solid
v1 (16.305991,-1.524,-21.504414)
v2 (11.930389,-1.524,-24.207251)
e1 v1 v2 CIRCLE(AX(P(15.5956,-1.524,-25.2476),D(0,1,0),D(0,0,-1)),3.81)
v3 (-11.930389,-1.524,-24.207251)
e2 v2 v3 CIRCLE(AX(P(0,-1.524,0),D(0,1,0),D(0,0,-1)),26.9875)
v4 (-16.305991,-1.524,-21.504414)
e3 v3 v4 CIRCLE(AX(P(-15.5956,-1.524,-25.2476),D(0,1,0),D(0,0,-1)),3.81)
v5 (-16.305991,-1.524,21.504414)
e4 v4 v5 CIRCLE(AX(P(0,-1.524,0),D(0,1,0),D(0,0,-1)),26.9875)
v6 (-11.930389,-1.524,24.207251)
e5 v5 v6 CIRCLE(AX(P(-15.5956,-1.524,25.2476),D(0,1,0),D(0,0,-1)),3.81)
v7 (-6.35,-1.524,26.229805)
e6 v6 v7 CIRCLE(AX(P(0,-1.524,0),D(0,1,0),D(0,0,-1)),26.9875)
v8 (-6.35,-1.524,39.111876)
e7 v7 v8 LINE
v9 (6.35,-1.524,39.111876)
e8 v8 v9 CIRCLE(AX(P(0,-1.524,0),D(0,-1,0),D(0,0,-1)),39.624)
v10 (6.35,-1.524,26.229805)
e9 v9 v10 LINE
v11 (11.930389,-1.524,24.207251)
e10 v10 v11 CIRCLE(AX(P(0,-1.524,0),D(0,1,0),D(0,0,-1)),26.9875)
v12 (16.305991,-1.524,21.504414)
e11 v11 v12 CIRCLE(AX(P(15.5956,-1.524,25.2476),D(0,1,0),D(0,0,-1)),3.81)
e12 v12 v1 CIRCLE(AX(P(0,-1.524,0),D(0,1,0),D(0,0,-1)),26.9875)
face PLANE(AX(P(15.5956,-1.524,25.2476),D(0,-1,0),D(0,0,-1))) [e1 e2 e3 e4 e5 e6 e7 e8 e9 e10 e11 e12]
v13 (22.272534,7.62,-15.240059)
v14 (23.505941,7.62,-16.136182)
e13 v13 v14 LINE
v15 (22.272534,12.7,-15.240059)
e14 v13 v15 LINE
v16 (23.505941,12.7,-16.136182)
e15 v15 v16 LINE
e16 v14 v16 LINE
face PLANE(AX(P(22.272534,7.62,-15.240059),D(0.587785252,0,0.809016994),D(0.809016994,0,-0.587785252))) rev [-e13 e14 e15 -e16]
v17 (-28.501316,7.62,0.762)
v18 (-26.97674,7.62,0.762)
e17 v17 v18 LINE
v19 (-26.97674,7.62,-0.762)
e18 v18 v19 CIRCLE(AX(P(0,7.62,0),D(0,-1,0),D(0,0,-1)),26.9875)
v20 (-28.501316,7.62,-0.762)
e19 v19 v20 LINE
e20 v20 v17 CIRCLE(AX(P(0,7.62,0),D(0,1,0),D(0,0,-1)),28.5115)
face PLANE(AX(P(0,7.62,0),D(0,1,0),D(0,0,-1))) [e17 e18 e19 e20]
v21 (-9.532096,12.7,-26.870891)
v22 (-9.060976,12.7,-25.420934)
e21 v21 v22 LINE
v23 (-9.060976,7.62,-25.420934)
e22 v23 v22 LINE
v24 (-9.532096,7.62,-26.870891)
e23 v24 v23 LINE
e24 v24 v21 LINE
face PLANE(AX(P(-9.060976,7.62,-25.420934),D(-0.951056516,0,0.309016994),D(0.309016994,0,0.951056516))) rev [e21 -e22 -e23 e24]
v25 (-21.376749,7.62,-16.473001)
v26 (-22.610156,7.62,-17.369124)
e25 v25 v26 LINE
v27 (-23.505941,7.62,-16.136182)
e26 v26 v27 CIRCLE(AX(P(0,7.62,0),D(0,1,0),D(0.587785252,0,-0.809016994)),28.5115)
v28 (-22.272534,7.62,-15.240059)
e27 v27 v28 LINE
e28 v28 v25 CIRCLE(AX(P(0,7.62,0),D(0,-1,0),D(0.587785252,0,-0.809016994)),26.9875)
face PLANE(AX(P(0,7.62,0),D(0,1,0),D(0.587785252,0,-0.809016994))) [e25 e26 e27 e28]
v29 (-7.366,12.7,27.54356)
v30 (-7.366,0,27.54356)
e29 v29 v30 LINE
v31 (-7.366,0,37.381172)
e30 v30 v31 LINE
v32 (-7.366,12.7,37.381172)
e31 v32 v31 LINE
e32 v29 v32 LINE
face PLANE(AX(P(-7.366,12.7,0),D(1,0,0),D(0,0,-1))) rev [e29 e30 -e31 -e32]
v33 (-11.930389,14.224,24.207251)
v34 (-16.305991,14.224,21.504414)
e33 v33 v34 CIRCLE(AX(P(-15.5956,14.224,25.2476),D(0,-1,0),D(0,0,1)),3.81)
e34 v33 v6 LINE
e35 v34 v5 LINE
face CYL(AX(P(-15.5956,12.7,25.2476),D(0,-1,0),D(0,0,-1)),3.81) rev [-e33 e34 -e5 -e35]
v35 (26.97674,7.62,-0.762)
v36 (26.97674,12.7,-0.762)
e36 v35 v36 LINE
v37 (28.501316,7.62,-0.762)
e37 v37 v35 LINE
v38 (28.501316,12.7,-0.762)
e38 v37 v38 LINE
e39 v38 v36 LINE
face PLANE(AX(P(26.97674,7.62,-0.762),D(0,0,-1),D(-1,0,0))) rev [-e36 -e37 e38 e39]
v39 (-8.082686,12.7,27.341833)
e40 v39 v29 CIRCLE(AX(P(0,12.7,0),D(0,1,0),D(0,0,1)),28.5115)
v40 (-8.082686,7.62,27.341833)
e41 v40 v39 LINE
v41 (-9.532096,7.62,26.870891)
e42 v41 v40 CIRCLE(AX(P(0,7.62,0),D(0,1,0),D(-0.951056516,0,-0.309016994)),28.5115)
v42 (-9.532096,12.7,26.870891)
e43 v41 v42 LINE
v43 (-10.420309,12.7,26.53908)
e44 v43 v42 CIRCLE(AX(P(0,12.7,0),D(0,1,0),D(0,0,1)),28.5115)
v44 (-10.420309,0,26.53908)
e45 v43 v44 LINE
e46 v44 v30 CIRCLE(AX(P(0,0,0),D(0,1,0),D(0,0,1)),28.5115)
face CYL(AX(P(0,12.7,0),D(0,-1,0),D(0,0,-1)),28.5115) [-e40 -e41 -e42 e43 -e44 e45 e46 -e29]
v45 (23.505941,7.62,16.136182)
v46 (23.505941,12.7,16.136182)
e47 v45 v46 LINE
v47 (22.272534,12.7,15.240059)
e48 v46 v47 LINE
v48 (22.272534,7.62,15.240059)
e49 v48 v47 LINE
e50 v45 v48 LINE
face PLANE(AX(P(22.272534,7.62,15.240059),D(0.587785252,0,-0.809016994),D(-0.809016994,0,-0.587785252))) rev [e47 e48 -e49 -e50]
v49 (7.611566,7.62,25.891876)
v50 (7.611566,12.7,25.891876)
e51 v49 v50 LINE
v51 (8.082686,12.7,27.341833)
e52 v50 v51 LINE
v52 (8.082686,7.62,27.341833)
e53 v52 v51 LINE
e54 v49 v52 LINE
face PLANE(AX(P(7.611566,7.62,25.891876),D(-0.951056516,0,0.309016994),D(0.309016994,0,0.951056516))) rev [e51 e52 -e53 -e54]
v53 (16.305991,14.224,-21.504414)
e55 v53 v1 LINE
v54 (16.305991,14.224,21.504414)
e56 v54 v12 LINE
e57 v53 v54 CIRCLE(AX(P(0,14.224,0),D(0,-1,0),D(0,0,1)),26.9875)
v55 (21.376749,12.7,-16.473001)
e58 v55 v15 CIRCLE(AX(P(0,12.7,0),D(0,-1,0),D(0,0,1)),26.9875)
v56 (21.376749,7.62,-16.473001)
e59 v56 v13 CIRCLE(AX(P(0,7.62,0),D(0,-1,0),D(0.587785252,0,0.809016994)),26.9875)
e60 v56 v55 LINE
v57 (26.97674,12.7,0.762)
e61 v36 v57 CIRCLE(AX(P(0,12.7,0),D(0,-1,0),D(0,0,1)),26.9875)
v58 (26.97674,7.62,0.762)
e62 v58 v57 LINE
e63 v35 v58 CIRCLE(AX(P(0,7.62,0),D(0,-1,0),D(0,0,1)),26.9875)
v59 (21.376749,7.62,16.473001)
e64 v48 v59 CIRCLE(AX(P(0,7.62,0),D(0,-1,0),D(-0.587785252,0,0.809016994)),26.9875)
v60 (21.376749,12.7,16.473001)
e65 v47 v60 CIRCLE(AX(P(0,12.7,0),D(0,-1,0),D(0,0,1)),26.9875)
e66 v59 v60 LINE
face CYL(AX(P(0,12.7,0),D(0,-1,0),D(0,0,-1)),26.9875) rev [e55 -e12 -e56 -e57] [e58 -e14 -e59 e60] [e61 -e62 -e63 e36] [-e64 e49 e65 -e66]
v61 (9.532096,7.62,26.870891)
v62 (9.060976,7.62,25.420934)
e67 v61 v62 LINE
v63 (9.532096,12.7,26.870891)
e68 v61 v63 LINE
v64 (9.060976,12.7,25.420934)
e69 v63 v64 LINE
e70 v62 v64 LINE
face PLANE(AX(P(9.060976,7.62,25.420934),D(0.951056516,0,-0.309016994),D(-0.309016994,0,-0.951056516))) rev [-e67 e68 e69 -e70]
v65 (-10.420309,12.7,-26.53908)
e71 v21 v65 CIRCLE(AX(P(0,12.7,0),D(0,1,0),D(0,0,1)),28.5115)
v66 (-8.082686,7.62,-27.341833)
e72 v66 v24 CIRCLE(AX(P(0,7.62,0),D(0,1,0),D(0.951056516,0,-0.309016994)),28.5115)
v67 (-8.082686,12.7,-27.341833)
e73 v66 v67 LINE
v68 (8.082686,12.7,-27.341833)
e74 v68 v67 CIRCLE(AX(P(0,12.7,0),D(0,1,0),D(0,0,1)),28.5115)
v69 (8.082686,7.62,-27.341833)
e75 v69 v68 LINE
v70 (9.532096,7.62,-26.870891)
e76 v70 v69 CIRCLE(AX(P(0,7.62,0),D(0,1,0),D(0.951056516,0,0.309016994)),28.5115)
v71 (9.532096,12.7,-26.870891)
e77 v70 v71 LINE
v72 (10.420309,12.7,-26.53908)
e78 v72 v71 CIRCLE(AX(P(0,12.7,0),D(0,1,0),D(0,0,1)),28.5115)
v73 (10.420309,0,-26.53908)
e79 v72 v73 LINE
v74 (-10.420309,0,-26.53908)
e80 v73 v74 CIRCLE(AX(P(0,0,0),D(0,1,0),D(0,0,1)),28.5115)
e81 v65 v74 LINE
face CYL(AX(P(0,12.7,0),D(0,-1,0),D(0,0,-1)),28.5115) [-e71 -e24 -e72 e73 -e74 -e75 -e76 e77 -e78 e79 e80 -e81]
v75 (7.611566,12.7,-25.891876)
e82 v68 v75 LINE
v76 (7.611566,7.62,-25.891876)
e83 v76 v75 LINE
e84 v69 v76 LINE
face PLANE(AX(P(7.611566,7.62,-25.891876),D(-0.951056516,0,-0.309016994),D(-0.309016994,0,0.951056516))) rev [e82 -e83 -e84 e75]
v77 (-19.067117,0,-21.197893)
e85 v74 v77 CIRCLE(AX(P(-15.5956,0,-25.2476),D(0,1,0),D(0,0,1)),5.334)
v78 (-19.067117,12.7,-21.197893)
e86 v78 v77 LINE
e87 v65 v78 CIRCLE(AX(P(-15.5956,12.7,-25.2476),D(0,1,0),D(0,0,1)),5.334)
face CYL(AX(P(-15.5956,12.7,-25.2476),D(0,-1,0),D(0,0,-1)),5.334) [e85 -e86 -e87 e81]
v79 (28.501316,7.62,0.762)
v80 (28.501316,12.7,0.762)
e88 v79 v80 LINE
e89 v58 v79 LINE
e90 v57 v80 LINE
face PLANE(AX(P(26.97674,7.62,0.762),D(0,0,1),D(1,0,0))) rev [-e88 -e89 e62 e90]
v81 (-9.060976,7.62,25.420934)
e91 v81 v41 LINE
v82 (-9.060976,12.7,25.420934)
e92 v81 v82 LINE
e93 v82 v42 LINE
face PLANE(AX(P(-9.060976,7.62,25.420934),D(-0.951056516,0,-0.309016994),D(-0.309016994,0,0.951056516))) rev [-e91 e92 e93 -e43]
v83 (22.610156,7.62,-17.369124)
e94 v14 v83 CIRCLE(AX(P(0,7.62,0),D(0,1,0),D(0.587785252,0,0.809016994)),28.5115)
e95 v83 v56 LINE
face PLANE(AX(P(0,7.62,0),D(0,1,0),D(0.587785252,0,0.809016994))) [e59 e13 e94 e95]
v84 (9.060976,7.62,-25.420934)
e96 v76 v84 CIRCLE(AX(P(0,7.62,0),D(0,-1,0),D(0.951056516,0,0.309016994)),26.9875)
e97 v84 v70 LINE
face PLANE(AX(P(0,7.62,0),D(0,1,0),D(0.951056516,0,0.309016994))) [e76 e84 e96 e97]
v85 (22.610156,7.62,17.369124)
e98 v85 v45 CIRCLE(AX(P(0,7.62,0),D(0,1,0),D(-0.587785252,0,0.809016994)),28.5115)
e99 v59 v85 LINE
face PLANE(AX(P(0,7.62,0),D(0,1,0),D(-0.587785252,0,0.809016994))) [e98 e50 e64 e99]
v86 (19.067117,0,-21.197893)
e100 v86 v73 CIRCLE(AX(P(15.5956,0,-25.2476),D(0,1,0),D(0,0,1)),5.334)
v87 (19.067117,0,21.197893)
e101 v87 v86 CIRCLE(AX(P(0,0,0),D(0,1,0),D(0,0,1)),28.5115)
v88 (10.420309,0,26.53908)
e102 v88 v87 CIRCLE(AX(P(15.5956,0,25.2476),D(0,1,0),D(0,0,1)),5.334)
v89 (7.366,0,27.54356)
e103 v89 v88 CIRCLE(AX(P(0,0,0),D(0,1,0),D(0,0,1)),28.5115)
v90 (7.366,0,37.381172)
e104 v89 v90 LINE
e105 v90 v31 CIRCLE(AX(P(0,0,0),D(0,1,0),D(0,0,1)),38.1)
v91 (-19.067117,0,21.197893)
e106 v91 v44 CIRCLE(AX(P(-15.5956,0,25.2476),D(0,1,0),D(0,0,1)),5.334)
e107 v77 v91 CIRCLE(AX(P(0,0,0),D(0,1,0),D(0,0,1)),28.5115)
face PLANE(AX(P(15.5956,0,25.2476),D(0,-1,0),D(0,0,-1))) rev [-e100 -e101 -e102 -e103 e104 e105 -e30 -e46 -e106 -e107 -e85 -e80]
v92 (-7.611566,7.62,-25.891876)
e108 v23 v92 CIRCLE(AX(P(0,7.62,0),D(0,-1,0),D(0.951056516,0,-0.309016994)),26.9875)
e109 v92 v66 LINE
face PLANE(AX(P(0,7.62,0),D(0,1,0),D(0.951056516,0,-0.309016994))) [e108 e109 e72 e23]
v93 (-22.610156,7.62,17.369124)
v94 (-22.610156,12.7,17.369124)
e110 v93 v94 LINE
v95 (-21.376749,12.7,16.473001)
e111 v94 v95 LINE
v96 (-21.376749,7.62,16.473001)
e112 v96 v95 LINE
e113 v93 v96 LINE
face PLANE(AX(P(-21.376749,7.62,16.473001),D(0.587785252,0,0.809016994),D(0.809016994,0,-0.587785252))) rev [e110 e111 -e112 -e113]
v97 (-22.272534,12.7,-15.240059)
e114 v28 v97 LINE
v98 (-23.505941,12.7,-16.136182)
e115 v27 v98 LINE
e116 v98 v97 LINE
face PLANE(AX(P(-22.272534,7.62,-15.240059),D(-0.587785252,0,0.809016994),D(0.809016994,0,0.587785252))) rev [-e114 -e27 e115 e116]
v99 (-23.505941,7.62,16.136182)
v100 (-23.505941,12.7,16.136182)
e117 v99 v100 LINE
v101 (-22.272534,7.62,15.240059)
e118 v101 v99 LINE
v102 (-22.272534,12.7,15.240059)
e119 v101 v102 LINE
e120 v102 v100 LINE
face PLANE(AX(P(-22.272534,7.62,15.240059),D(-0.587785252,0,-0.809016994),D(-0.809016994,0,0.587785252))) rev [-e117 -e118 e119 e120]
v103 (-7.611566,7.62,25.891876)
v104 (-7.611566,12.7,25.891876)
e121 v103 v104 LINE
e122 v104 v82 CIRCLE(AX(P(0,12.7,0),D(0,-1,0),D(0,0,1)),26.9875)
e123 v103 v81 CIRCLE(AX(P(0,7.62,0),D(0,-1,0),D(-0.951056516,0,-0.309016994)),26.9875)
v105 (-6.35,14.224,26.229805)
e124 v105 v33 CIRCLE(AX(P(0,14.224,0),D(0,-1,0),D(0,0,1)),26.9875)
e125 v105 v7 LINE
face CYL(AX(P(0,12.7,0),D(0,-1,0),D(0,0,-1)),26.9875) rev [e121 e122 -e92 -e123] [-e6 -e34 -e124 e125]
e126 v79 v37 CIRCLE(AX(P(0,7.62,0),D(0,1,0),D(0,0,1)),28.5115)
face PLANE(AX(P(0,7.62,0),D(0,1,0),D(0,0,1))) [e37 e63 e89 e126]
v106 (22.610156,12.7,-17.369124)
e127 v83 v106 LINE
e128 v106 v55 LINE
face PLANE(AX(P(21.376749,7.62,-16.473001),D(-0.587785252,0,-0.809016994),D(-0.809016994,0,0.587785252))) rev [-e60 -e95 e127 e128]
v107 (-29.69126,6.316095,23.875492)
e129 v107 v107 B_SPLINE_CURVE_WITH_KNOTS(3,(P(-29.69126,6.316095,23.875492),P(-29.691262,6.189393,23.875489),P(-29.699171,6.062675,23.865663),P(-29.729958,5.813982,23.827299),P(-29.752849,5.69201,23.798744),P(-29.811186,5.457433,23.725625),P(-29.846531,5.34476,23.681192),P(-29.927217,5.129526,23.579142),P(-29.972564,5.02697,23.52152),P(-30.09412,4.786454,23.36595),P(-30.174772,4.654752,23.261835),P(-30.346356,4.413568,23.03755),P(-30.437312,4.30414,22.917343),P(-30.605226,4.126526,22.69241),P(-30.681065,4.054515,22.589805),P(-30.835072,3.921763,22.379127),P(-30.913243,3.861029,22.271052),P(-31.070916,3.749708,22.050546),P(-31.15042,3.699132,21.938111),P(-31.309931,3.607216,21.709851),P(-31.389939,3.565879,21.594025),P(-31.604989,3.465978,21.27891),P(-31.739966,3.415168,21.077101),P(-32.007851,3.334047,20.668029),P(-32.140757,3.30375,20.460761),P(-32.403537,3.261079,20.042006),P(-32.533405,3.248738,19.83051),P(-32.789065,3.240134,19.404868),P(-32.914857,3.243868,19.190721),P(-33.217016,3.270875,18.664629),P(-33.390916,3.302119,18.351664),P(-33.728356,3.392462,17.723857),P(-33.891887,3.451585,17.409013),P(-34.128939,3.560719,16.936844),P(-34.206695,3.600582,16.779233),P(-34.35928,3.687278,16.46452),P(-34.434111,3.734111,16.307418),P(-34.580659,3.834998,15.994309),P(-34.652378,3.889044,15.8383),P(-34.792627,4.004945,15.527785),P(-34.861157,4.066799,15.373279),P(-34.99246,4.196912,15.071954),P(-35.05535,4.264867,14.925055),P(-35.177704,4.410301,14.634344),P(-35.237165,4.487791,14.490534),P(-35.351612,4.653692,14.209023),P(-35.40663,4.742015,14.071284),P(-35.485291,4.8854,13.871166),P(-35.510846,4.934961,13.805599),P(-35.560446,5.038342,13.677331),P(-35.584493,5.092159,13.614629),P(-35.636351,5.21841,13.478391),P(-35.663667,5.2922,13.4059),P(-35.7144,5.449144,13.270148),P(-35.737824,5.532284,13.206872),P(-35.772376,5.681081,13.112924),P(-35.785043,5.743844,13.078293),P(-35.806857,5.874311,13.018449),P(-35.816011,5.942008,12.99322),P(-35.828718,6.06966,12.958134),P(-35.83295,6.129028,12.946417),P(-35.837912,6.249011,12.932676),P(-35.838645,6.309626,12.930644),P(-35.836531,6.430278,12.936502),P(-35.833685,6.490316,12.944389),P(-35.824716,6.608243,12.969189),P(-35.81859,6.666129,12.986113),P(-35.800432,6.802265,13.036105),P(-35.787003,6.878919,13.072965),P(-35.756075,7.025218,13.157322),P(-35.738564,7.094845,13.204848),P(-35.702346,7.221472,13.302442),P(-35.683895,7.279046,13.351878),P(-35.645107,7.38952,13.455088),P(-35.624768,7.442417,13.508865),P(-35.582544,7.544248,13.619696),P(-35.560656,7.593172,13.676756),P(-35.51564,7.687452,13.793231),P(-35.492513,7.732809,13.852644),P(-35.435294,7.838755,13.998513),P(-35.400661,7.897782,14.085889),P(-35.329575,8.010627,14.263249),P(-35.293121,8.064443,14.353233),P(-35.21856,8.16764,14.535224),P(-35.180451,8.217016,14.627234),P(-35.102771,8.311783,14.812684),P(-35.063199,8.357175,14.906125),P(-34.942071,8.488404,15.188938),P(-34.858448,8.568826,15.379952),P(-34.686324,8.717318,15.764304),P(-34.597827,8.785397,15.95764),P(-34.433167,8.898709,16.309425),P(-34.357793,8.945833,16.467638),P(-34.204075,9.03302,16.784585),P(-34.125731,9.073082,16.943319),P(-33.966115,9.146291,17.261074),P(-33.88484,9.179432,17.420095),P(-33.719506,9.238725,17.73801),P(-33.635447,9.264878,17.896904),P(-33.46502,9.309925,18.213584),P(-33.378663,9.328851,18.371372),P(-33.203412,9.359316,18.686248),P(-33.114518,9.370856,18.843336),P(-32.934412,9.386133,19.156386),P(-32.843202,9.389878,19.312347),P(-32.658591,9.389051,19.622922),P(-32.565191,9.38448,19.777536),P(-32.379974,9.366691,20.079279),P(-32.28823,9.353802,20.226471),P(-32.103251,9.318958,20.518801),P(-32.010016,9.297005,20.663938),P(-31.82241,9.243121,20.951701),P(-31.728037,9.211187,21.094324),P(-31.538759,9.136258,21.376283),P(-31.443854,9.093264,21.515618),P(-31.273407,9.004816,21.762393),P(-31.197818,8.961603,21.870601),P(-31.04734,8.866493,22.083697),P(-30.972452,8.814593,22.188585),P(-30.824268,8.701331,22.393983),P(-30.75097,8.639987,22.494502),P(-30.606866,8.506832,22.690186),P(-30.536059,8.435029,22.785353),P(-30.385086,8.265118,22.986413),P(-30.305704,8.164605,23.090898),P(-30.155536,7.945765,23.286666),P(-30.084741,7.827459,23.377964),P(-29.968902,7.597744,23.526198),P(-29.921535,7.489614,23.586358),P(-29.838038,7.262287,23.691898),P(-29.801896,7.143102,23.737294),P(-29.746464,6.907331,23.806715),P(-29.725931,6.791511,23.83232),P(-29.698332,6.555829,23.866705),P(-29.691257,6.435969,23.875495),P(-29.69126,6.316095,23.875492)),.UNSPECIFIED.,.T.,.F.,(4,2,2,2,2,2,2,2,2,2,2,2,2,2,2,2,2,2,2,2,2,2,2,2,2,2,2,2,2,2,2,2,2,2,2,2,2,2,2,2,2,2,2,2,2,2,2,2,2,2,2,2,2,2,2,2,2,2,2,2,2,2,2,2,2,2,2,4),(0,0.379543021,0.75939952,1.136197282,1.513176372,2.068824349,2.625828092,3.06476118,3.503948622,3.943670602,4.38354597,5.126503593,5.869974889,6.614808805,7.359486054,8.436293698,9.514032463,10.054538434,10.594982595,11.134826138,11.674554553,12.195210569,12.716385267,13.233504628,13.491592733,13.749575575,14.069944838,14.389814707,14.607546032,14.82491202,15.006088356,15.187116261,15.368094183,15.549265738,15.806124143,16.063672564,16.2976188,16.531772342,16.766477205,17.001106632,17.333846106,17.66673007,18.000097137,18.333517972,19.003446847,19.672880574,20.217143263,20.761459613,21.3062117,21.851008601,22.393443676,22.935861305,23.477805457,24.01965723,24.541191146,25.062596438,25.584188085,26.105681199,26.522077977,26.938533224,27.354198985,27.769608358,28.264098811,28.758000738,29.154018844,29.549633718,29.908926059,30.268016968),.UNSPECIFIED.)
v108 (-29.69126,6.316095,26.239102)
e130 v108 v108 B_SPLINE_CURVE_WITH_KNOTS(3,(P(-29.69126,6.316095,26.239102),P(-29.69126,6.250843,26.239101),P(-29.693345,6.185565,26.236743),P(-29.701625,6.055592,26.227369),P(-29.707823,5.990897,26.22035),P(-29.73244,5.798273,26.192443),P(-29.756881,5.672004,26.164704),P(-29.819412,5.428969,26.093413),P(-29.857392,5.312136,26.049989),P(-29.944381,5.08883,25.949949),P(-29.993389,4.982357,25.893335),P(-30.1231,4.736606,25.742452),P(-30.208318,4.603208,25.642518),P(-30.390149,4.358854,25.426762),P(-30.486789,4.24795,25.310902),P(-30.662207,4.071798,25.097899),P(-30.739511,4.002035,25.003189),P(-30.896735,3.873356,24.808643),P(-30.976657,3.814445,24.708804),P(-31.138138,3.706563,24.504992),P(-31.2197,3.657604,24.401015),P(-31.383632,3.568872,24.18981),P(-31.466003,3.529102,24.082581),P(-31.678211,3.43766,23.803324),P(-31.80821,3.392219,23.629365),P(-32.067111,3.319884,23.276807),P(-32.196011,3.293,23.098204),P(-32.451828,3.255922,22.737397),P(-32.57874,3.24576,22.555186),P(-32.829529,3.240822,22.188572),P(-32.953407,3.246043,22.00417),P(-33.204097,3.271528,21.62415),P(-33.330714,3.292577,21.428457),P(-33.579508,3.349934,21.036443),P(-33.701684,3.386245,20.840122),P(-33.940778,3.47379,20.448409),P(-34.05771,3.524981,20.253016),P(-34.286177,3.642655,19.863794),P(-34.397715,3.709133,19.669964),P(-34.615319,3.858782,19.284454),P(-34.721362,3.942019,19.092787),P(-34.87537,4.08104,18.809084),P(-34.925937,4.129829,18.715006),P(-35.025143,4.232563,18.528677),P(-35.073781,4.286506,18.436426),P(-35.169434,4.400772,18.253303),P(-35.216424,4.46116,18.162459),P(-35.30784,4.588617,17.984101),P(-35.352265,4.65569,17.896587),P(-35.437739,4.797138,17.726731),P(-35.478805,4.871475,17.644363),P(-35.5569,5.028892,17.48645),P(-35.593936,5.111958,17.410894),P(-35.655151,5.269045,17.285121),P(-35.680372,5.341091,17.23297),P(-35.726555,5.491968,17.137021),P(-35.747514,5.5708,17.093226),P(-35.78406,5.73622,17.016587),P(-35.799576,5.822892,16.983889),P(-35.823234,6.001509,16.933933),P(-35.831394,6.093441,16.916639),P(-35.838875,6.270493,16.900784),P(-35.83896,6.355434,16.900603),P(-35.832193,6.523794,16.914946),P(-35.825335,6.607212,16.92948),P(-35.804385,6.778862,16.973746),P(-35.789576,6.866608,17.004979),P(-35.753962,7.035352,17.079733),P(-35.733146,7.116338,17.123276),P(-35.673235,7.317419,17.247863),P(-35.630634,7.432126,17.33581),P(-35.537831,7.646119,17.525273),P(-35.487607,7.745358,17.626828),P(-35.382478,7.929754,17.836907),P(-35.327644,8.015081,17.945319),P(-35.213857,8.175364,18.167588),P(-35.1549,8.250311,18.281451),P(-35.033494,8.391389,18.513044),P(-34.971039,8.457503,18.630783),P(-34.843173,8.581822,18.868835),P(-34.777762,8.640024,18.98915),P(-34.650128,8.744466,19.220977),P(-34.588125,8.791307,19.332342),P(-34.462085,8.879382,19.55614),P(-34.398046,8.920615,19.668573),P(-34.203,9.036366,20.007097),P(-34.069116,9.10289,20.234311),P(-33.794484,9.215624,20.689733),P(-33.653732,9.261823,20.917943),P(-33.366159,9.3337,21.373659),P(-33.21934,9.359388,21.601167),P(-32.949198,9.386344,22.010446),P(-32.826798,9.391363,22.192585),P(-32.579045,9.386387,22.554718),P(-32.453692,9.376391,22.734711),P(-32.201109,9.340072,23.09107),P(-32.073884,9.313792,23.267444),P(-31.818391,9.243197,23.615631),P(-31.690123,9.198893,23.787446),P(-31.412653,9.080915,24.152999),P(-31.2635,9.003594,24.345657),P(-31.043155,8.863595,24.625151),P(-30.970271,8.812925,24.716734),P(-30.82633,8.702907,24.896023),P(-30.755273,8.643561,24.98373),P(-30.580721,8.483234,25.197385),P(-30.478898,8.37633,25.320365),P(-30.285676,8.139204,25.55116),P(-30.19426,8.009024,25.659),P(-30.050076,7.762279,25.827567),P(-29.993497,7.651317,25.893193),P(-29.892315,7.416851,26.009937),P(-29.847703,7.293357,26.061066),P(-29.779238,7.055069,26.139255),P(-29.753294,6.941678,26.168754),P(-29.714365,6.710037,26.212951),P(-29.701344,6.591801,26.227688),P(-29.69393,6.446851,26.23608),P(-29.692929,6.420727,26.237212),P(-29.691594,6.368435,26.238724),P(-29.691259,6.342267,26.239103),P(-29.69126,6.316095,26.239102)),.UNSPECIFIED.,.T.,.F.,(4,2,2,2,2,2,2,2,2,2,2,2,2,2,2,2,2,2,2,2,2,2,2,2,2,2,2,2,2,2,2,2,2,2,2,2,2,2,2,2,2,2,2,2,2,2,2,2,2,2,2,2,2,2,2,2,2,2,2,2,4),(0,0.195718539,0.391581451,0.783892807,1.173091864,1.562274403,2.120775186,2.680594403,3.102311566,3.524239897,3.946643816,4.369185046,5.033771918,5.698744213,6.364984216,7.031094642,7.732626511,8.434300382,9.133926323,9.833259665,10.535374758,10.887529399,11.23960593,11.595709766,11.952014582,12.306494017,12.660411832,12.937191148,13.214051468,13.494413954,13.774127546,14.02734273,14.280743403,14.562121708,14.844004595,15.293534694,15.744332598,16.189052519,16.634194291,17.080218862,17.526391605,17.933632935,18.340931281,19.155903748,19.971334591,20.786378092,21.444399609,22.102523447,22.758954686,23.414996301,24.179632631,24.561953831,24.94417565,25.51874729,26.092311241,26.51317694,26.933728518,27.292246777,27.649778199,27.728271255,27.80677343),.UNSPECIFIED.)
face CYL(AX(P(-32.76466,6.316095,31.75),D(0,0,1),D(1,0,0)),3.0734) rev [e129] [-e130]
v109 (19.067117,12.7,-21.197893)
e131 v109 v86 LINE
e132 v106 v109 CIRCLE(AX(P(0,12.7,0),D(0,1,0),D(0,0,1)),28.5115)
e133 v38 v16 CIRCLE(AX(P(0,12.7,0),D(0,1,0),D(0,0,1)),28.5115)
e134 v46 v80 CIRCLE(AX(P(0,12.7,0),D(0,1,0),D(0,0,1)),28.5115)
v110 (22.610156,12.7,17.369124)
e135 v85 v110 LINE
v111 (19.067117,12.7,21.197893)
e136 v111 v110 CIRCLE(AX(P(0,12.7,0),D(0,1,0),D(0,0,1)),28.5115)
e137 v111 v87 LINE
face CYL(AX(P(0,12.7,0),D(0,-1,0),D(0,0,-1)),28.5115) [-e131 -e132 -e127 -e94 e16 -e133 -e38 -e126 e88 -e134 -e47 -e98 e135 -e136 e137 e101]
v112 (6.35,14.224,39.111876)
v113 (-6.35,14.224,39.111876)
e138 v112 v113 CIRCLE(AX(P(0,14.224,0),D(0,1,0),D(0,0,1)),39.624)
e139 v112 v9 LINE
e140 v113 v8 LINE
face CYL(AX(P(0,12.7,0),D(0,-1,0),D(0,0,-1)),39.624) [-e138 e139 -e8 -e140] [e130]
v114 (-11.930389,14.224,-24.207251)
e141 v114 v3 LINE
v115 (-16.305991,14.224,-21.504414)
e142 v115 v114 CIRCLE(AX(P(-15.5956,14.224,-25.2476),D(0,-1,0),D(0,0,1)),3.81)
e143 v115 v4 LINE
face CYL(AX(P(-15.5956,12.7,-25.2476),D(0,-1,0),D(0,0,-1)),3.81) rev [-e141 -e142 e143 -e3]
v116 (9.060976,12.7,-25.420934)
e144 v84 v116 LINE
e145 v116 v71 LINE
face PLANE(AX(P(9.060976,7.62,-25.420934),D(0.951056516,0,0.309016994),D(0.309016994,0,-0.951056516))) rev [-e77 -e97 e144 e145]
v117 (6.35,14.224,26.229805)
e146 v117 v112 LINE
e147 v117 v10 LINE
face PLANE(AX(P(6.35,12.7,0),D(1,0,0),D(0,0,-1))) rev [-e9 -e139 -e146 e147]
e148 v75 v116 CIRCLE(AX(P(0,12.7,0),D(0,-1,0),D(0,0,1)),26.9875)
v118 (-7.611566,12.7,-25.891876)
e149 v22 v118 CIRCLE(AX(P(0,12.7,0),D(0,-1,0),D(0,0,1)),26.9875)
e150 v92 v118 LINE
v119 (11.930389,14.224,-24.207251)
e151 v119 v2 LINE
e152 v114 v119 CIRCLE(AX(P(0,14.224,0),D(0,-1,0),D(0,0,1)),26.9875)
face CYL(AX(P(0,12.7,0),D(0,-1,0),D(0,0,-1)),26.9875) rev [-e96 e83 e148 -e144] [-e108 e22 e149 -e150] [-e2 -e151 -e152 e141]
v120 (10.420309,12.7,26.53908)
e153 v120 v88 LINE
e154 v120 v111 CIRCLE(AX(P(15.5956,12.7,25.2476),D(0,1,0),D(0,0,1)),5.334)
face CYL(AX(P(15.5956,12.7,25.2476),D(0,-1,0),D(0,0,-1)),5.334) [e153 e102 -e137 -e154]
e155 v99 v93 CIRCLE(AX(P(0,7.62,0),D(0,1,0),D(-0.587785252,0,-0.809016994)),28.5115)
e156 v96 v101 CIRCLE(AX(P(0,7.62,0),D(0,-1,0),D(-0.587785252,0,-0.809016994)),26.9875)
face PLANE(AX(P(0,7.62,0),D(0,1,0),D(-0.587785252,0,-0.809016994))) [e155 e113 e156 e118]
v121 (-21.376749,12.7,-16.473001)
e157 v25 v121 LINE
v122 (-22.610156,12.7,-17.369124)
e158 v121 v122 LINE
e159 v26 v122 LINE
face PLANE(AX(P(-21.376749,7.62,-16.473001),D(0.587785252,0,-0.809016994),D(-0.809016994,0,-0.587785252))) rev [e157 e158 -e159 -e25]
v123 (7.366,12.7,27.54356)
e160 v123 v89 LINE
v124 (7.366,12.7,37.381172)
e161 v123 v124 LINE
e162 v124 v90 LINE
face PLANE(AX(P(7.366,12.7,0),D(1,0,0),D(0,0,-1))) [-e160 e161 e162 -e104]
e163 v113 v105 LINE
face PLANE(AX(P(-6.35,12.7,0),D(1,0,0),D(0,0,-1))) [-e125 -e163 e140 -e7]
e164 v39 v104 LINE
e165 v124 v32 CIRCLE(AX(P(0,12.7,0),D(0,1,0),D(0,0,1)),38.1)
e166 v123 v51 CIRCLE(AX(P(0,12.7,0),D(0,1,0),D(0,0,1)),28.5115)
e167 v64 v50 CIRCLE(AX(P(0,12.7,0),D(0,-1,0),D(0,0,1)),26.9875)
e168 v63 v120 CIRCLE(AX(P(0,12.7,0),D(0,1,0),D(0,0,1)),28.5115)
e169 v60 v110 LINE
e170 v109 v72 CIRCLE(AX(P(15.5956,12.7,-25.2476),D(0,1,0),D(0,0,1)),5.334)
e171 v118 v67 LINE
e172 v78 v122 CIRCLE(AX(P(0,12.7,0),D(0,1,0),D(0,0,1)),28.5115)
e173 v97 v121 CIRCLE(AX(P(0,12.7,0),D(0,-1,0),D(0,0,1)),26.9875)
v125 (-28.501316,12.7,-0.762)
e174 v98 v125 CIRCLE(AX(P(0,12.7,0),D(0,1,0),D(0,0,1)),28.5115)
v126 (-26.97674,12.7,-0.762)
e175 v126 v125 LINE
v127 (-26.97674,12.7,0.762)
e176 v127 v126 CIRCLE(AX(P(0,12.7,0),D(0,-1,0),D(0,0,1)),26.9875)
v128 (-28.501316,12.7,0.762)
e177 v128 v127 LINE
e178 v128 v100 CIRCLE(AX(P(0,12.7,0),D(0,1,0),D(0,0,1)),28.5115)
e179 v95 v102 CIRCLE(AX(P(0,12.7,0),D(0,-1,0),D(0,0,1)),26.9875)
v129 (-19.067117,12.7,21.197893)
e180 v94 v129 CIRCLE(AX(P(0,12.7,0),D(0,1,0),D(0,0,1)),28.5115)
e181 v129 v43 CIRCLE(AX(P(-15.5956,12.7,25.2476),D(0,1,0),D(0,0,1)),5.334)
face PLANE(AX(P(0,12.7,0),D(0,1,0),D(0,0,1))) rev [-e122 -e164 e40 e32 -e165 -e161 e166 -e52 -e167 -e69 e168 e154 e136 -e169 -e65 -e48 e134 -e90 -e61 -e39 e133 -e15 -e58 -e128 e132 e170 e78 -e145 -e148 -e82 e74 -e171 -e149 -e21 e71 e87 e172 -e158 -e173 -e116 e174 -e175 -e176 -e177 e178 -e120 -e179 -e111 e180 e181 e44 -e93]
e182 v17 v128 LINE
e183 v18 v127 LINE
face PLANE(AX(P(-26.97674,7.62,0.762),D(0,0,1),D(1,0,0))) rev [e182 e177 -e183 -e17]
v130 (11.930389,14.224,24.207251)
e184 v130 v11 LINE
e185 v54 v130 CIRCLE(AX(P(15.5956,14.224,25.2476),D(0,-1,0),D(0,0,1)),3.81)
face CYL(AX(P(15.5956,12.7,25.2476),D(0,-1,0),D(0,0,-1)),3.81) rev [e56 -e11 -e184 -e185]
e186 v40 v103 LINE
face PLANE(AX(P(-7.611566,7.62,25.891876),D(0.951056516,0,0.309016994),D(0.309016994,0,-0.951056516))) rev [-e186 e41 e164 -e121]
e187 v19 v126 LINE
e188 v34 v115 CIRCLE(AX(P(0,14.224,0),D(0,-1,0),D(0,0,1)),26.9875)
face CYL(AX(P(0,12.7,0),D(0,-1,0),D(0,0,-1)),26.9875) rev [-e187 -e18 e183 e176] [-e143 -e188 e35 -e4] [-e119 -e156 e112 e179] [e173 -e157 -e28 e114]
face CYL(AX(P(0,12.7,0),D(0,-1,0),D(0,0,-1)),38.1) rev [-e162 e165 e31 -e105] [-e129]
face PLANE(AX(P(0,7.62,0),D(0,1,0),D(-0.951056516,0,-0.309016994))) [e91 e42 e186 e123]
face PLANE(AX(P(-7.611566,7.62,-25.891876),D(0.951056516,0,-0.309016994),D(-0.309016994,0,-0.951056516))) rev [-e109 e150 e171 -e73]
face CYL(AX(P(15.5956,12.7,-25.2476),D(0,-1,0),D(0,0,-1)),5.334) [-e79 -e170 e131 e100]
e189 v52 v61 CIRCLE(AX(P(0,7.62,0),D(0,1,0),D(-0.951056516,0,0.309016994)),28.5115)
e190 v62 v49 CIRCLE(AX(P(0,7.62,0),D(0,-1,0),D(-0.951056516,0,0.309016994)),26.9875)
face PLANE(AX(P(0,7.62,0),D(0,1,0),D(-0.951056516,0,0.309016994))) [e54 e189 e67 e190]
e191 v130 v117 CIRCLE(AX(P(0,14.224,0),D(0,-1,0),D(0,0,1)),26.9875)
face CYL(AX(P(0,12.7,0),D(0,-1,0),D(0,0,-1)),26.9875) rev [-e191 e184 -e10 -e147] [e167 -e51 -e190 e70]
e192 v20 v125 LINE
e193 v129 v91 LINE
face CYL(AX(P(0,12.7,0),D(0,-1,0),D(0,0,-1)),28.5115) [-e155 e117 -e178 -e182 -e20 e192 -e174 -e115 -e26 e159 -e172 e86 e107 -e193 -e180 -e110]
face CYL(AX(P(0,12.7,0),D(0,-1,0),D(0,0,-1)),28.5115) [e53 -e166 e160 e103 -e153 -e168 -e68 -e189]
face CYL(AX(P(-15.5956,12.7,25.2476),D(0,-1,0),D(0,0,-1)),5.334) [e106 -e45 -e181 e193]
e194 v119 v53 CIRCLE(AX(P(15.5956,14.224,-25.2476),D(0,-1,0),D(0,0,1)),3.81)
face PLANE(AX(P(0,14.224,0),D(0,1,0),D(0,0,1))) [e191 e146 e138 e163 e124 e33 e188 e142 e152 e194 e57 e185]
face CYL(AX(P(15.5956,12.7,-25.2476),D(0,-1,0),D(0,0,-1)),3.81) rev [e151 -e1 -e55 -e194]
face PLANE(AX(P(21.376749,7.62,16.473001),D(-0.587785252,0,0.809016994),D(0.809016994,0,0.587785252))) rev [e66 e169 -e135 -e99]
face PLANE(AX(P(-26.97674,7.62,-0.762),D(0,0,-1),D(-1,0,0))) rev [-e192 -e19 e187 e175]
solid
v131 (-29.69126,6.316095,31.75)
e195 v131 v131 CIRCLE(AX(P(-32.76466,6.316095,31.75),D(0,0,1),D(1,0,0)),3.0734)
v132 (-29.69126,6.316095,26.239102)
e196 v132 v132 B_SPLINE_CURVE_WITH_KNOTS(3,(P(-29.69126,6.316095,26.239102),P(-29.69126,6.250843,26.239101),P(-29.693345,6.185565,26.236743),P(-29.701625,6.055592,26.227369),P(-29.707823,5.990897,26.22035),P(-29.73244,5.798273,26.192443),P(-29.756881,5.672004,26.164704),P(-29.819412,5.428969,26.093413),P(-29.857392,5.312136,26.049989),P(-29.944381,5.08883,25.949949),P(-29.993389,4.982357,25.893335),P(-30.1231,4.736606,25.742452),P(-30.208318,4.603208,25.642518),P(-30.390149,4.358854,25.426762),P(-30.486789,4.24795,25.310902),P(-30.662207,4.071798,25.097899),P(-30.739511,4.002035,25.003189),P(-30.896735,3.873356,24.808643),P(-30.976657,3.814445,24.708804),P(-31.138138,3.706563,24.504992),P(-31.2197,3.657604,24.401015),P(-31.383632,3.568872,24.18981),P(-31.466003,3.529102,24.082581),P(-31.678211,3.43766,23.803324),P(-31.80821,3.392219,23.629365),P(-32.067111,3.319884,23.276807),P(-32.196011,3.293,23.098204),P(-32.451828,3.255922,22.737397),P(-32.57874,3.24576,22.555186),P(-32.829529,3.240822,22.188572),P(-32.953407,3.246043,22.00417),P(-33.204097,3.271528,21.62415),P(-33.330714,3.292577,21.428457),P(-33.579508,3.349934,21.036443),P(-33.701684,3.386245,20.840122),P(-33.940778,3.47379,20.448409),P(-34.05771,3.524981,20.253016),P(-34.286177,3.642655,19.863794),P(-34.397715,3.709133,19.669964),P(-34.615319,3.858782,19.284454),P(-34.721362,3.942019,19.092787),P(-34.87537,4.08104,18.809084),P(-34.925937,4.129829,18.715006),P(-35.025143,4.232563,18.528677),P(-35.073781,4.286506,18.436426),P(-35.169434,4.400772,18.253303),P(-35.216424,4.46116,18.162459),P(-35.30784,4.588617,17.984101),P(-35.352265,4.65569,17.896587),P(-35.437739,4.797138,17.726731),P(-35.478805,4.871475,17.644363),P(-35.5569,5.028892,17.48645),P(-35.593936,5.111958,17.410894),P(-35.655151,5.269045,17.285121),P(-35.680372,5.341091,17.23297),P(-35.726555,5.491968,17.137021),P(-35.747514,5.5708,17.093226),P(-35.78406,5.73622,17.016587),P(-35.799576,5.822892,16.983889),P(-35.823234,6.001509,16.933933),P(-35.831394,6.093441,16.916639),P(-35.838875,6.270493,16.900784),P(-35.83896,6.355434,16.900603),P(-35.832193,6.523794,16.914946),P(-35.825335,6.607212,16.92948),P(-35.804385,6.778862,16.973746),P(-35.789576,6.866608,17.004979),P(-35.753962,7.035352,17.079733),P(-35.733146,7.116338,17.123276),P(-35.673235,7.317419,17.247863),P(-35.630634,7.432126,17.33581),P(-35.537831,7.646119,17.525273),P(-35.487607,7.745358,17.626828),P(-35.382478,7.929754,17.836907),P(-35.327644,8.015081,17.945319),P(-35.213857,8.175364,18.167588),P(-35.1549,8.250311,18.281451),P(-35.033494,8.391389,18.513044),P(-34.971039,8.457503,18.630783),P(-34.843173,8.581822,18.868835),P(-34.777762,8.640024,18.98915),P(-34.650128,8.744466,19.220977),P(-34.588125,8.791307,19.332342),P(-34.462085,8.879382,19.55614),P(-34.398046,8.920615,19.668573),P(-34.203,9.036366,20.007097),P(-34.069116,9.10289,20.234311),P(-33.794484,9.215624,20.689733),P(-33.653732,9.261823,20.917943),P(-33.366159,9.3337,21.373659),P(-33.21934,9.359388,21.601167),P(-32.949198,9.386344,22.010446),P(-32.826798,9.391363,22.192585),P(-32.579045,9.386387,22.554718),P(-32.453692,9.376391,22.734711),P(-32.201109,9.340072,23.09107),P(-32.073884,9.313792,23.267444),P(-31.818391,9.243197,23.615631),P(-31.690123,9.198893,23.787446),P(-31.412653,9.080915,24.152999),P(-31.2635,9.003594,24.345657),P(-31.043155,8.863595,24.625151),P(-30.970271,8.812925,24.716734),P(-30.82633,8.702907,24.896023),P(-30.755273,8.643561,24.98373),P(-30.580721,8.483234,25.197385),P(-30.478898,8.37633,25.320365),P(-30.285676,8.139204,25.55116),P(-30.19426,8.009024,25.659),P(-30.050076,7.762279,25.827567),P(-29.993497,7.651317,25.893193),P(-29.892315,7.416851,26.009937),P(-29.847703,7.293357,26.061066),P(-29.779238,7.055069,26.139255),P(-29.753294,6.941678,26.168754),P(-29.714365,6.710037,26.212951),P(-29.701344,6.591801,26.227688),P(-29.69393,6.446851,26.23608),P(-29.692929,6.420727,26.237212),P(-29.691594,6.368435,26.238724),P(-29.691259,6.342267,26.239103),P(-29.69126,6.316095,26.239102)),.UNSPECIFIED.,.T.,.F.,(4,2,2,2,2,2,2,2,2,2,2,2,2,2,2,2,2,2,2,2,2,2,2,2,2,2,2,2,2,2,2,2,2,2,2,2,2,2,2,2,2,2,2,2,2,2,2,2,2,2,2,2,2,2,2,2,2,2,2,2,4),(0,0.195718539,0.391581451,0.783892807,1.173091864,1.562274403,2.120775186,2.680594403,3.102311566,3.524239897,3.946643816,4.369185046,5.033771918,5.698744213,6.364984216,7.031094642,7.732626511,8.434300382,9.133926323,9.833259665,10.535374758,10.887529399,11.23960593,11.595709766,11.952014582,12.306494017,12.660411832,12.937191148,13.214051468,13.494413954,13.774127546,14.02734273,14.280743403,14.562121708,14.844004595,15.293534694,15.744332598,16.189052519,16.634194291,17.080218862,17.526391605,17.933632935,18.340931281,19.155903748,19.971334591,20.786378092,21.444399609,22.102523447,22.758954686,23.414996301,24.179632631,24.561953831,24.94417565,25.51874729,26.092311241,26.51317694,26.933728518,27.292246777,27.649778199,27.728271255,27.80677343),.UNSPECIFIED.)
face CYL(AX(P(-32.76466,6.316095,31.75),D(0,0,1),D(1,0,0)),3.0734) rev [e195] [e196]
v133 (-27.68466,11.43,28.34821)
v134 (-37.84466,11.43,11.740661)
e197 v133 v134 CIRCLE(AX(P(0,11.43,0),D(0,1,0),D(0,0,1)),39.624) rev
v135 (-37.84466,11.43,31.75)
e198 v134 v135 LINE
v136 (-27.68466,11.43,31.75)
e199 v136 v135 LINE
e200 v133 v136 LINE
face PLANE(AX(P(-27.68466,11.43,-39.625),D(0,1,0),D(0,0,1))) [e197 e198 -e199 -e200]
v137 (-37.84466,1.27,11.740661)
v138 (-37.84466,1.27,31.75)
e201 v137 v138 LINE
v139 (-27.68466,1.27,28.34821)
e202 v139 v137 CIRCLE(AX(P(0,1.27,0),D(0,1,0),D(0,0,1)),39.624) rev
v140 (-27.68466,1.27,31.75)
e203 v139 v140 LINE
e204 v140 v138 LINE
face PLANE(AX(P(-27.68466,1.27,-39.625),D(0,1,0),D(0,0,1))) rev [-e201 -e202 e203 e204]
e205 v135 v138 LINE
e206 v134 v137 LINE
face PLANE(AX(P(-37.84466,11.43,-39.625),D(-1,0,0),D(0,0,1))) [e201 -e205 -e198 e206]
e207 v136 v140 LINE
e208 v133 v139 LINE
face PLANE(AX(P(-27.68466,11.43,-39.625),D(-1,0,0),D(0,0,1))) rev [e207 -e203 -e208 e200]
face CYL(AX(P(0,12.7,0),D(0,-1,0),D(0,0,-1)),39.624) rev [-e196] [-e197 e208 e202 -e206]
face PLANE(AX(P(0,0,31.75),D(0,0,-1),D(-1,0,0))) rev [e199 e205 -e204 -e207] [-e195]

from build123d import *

# Parameters (mm, degrees)
BOSS_EXTRUDE1_DEPTH                    = 12.7
BOSS_EXTRUDE2_START                    = 1.524
BOSS_EXTRUDE2_DEPTH                    = 1.524
CUT_EXTRUDE1_START                     = -5.08
CUT_EXTRUDE1_DEPTH                     = 5.08
CIRPATTERN1_COUNT                      = 10
BOSS_EXTRUDE3_DEPTH                    = 1.524
BOSS_EXTRUDE4_REACH                    = 91.564
BOSS_EXTRUDE4_START                    = -31.75
SKETCH5_W                              = 10.16
SKETCH5_H                              = 10.16
PIPE_TAP_DRILL_FOR_1_16_TAP1_OUTLINE_W = 3.0734
PIPE_TAP_DRILL_FOR_1_16_TAP1_OUTLINE_H = 18.819417373


# Read off the part's stored shape, not the designer's step: Pipe Tap Drill for 1/16 Tap1
with BuildPart() as part:
    # Sketch1 → Boss-Extrude1 (new body)
    with BuildSketch(Plane(origin=(0, 0, 0), x_dir=(1, 0, 0), z_dir=(0, 1, 0))):
        with BuildLine():
            Line((-6.35, -39.111876406), (-6.35, -26.229804731))
            ThreePointArc((-6.35, -26.229804731), (-9.195968421, -25.372412598), (-11.930388818, -24.207250544))
            ThreePointArc((-11.930388818, -24.207250544), (-17.597866727, -28.489054604), (-16.305991261, -21.504413623))
            ThreePointArc((-16.305991261, -21.504413623), (-26.9875, 0), (-16.305991261, 21.504413623))
            ThreePointArc((-16.305991261, 21.504413623), (-17.597866727, 28.489054604), (-11.930388818, 24.207250544))
            ThreePointArc((-11.930388818, 24.207250544), (0, 26.9875), (11.930388818, 24.207250544))
            ThreePointArc((11.930388818, 24.207250544), (17.597866727, 28.489054604), (16.305991261, 21.504413623))
            ThreePointArc((16.305991261, 21.504413623), (25.931572766, 7.475205023), (25.250733281, -9.525))
            ThreePointArc((25.250733281, -9.525), (21.624452048, -16.146461838), (16.305991261, -21.504413623))
            ThreePointArc((16.305991261, -21.504413623), (17.597866727, -28.489054604), (11.930388818, -24.207250544))
            ThreePointArc((11.930388818, -24.207250544), (9.195968421, -25.372412598), (6.35, -26.229804731))
            Line((6.35, -26.229804731), (6.35, -39.111876406))
            ThreePointArc((6.35, -39.111876406), (0, 39.624), (-6.35, -39.111876406))
        make_face()
        with BuildLine():
            ThreePointArc((-10.420309243, -26.539080382), (-8.907325286, -27.084408587), (-7.366, -27.543559615))
            Line((-7.366, -27.543559615), (-7.366, -37.38117232))
            ThreePointArc((-7.366, -37.38117232), (0, 38.1), (7.366, -37.38117232))
            Line((7.366, -37.38117232), (7.366, -27.543559615))
            ThreePointArc((7.366, -27.543559615), (8.907325286, -27.084408587), (10.420309243, -26.539080382))
            ThreePointArc((10.420309243, -26.539080382), (18.398773418, -29.785636446), (19.067117112, -21.197893228))
            ThreePointArc((19.067117112, -21.197893228), (27.63343957, -7.021299722), (26.873407064, 9.525))
            ThreePointArc((26.873407064, 9.525), (23.700148723, 15.849560965), (19.067117112, 21.197893228))
            ThreePointArc((19.067117112, 21.197893228), (18.398773418, 29.785636446), (10.420309243, 26.539080382))
            ThreePointArc((10.420309243, 26.539080382), (0, 28.5115), (-10.420309243, 26.539080382))
            ThreePointArc((-10.420309243, 26.539080382), (-18.398773418, 29.785636446), (-19.067117112, 21.197893228))
            ThreePointArc((-19.067117112, 21.197893228), (-28.5115, 0), (-19.067117112, -21.197893228))
            ThreePointArc((-19.067117112, -21.197893228), (-18.398773418, -29.785636446), (-10.420309243, -26.539080382))
        make_face(mode=Mode.SUBTRACT)
    extrude(amount=BOSS_EXTRUDE1_DEPTH)

    # Sketch2 → Boss-Extrude2 (add)
    with BuildSketch(Plane.XZ.offset(BOSS_EXTRUDE2_START)):
        with BuildLine():
            Line((-6.35, 26.229804731), (-6.35, 39.111876406))
            ThreePointArc((-6.35, 39.111876406), (0, -39.624), (6.35, 39.111876406))
            Line((6.35, 39.111876406), (6.35, 26.229804731))
            ThreePointArc((6.35, 26.229804731), (9.195968421, 25.372412598), (11.930388818, 24.207250544))
            ThreePointArc((11.930388818, 24.207250544), (17.597866727, 28.489054604), (16.305991261, 21.504413623))
            ThreePointArc((16.305991261, 21.504413623), (26.9875, 0), (16.305991261, -21.504413623))
            ThreePointArc((16.305991261, -21.504413623), (17.597866727, -28.489054604), (11.930388818, -24.207250544))
            ThreePointArc((11.930388818, -24.207250544), (0, -26.9875), (-11.930388818, -24.207250544))
            ThreePointArc((-11.930388818, -24.207250544), (-17.597866727, -28.489054604), (-16.305991261, -21.504413623))
            ThreePointArc((-16.305991261, -21.504413623), (-26.9875, 0), (-16.305991261, 21.504413623))
            ThreePointArc((-16.305991261, 21.504413623), (-17.597866727, 28.489054604), (-11.930388818, 24.207250544))
            ThreePointArc((-11.930388818, 24.207250544), (-9.195968421, 25.372412598), (-6.35, 26.229804731))
        make_face()
    extrude(amount=-BOSS_EXTRUDE2_DEPTH)

    # Sketch3 → Cut-Extrude1 (cut)
    with BuildSketch(Plane(origin=(0, 12.7, 0), x_dir=(1, 0, 0), z_dir=(0, 1, 0)).offset(CUT_EXTRUDE1_START)):
        with BuildLine():
            Line((26.976740208, 0.762), (28.501315553, 0.762))
            ThreePointArc((28.501315553, 0.762), (28.5115, 0), (28.501315553, -0.762))
            Line((28.501315553, -0.762), (26.976740208, -0.762))
            ThreePointArc((26.976740208, -0.762), (26.9875, 0), (26.976740208, 0.762))
        make_face()
    cut_extrude1 = extrude(amount=CUT_EXTRUDE1_DEPTH, mode=Mode.SUBTRACT)

    # CirPattern1: Cut-Extrude1 ×10 about axis
    cirpattern1_axis = Axis((0, 0, 0), (0, 1, 0))
    for i in range(1, CIRPATTERN1_COUNT):
        add(cut_extrude1.rotate(cirpattern1_axis, i * 360 / CIRPATTERN1_COUNT), mode=Mode.SUBTRACT)

    # Sketch4 → Boss-Extrude3 (add)
    with BuildSketch(Plane(origin=(0, 12.7, 0), x_dir=(1, 0, 0), z_dir=(0, 1, 0))):
        with BuildLine():
            Line((-6.35, -39.111876406), (-6.35, -26.229804731))
            ThreePointArc((-6.35, -26.229804731), (-9.195968421, -25.372412598), (-11.930388818, -24.207250544))
            ThreePointArc((-11.930388818, -24.207250544), (-17.597866727, -28.489054604), (-16.305991261, -21.504413623))
            ThreePointArc((-16.305991261, -21.504413623), (-26.9875, 0), (-16.305991261, 21.504413623))
            ThreePointArc((-16.305991261, 21.504413623), (-17.597866727, 28.489054604), (-11.930388818, 24.207250544))
            ThreePointArc((-11.930388818, 24.207250544), (0, 26.9875), (11.930388818, 24.207250544))
            ThreePointArc((11.930388818, 24.207250544), (17.597866727, 28.489054604), (16.305991261, 21.504413623))
            ThreePointArc((16.305991261, 21.504413623), (26.9875, 0), (16.305991261, -21.504413623))
            ThreePointArc((16.305991261, -21.504413623), (17.597866727, -28.489054604), (11.930388818, -24.207250544))
            ThreePointArc((11.930388818, -24.207250544), (9.195968421, -25.372412598), (6.35, -26.229804731))
            Line((6.35, -26.229804731), (6.35, -39.111876406))
            ThreePointArc((6.35, -39.111876406), (0, 39.624), (-6.35, -39.111876406))
        make_face()
    extrude(amount=BOSS_EXTRUDE3_DEPTH)


with BuildPart() as body_2:

    # Sketch5 → Boss-Extrude4 (new, up to next)
    with BuildSketch(Plane(origin=(0, 0, 0), x_dir=(-1, 0, 0), z_dir=(0, 0, -1)).offset(BOSS_EXTRUDE4_START), mode=Mode.PRIVATE) as boss_extrude4_sk1:
        with Locations((32.764659515, 6.35)):
            Rectangle(SKETCH5_W, SKETCH5_H)
    boss_extrude4_tool1 = extrude(boss_extrude4_sk1.sketch, amount=BOSS_EXTRUDE4_REACH, mode=Mode.PRIVATE) - part.part
    add(boss_extrude4_tool1.solids().sort_by_distance((-32.76466, 6.35, 31.75))[0])


with BuildPart() as pipe_tap_drill_for_1_16_tap1_tool:
    # Pipe Tap Drill for 1/16 Tap1 outline → Pipe Tap Drill for 1/16 Tap1 (revolve)
    with BuildSketch(Plane(origin=(-32.764659515, 6.316095099, 0), x_dir=(1, 0, 0), z_dir=(0, -1, 0))):
        with Locations((1.5367, 22.340291314)):
            Rectangle(PIPE_TAP_DRILL_FOR_1_16_TAP1_OUTLINE_W, PIPE_TAP_DRILL_FOR_1_16_TAP1_OUTLINE_H)
    revolve(axis=Axis((-32.764659515, 6.316095099, 0), (0, 0, 1)))


with BuildPart() as part_1:
    add(part.part)

    # Pipe Tap Drill for 1/16 Tap1: cut by pipe_tap_drill_for_1_16_tap1_tool
    add(pipe_tap_drill_for_1_16_tap1_tool.part, mode=Mode.SUBTRACT)


with BuildPart() as body_2_1:
    add(body_2.part)

    # Pipe Tap Drill for 1/16 Tap1: cut by pipe_tap_drill_for_1_16_tap1_tool
    add(pipe_tap_drill_for_1_16_tap1_tool.part, mode=Mode.SUBTRACT)


solid = Compound([part_1.part, body_2_1.part])
